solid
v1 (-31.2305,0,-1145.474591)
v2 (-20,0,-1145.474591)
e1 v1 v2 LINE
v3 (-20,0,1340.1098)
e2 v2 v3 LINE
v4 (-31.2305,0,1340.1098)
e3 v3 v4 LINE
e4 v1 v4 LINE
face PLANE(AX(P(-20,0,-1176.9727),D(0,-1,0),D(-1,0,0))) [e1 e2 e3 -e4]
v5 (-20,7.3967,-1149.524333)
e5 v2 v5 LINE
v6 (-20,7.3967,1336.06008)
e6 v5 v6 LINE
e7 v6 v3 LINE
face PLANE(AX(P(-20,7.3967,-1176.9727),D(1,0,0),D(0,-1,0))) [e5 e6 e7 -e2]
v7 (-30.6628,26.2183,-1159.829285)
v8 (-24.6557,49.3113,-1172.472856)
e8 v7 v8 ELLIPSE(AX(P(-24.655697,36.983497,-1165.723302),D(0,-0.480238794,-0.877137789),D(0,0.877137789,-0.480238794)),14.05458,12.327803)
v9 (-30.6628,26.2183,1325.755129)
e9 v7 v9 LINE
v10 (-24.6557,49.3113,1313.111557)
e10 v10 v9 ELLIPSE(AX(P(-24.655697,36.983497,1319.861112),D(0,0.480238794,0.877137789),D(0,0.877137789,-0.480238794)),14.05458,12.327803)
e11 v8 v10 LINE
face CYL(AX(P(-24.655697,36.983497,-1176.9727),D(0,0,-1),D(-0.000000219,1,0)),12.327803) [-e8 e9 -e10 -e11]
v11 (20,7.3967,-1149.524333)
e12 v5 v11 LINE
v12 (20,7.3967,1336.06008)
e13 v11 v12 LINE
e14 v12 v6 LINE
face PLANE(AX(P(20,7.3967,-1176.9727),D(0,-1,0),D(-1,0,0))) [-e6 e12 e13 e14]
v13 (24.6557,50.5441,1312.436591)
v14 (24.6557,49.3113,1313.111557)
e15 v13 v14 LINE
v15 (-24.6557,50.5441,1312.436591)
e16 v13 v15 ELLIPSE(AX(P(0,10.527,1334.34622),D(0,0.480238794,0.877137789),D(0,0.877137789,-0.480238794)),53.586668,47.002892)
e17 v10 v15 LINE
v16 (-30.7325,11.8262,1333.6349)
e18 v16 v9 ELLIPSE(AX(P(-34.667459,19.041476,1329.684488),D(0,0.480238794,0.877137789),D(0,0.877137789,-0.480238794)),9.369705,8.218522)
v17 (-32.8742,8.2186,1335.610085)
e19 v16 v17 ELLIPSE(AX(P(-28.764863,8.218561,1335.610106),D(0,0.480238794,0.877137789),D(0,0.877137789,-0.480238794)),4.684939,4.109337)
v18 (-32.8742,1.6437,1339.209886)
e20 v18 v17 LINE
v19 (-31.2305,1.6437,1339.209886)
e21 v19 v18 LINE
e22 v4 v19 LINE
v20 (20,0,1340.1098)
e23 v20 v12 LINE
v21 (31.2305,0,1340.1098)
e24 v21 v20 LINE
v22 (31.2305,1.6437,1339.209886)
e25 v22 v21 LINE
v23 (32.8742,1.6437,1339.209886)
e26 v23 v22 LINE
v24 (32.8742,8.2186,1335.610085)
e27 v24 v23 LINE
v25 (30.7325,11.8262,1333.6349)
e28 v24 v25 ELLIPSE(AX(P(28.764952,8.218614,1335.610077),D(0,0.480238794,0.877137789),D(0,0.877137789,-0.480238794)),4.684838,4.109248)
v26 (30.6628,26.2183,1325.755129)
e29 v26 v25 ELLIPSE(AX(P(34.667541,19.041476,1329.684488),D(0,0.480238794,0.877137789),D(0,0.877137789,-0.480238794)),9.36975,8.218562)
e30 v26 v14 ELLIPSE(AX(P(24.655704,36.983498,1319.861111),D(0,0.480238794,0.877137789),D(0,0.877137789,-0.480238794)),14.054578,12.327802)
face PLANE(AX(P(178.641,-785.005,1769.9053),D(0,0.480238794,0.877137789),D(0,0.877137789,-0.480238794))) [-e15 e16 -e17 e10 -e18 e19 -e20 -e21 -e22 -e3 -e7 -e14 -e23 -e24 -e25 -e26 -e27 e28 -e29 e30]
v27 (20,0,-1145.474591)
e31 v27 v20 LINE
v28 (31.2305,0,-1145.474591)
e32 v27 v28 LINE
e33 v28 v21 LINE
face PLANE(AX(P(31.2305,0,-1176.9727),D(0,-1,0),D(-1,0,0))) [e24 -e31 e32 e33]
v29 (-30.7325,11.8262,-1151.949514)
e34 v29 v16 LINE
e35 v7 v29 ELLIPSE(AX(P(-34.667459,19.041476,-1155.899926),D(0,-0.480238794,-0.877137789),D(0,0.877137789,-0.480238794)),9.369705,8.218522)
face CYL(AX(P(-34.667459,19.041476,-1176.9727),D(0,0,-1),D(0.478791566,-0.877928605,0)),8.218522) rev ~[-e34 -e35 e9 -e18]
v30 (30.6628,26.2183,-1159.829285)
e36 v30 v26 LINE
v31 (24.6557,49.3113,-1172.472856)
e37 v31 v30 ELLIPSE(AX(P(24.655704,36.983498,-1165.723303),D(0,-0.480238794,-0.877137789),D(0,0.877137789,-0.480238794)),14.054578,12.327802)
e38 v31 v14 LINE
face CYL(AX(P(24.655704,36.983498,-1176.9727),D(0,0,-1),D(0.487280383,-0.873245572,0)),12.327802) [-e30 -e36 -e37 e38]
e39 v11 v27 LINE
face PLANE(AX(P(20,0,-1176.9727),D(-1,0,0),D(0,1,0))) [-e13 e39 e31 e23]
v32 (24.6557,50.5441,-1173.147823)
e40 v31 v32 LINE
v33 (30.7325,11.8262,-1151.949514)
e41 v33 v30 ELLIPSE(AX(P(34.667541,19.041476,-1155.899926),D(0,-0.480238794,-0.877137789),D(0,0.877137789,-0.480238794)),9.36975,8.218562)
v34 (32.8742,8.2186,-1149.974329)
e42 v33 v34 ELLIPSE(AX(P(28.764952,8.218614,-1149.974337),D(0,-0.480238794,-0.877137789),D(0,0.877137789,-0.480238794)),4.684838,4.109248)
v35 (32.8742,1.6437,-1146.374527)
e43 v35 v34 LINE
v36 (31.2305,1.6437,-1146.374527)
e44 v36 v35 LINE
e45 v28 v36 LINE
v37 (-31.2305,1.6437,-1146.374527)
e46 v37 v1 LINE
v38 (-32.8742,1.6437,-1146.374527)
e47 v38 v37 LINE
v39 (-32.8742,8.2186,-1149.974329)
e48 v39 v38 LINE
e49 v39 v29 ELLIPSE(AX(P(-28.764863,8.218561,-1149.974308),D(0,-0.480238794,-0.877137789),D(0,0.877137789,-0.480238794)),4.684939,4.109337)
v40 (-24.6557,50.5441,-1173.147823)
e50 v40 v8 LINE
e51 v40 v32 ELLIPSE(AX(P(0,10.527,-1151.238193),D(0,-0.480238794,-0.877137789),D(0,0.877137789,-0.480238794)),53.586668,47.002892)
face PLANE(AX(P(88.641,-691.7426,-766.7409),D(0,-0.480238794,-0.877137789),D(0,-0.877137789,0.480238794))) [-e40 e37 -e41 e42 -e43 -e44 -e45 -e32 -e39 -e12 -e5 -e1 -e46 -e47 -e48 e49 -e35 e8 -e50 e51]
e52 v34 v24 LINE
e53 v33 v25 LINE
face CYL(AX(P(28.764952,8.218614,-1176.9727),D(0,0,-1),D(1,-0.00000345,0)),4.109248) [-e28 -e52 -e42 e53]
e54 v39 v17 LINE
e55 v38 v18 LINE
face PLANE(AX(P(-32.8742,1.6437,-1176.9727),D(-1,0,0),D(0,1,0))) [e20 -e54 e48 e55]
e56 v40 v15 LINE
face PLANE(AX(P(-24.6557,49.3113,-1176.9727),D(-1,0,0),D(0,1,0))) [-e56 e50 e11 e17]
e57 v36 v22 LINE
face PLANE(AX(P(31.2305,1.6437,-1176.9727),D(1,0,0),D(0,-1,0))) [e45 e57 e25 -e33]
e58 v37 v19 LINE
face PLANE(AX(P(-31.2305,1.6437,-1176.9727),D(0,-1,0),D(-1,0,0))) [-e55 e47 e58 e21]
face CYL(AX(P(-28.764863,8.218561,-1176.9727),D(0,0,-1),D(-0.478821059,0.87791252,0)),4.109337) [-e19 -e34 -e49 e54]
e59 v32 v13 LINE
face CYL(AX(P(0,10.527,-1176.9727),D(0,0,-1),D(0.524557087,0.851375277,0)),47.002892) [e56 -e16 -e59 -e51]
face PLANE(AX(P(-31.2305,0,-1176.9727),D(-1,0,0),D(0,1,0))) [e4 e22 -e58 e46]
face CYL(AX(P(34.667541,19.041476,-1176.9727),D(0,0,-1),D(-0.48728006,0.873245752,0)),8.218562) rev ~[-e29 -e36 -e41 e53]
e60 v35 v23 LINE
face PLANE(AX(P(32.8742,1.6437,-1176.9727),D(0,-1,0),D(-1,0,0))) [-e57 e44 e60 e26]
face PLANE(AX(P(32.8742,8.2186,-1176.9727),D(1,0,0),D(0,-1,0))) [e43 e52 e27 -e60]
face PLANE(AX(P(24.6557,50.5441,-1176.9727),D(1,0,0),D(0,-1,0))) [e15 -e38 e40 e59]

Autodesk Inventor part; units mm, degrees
sketch "Поручень" plane through (0, 0, 0) normal (0, 0, 1) x (1, 0, 0)
  line L0 (20.3655, -7.6059) -> (20.3655, -0.2092)
  line L1 (20.3655, -0.2092) -> (-19.6345, -0.2092)
  line L2 (-19.6345, -0.2092) -> (-19.6345, -7.6059)
  line L3 (-19.6345, -7.6059) -> (-30.865, -7.6059)
  line L4 (-30.865, -7.6059) -> (-30.865, -5.9622)
  line L5 (-30.865, -5.9622) -> (-32.5087, -5.9622)
  line L6 (-32.5087, -5.9622) -> (-32.5087, 0.6126)
  arc A0 (-30.367, 4.2203) -> (-32.5087, 0.6126) centre (-28.3995, 0.6126) ccw
  arc A1 (-30.367, 4.2203) -> (-30.2973, 18.6123) centre (-34.302, 11.4355) ccw
  arc A2 (-24.2902, 41.7054) -> (-30.2973, 18.6123) centre (-24.2902, 29.3776) ccw
  line L7 (-24.2902, 41.7054) -> (-24.2902, 42.9382)
  arc A3 (25.0211, 42.9382) -> (-24.2902, 42.9382) centre (0.3655, 2.9211) ccw
  line L8 (25.0211, 42.9382) -> (25.0211, 41.7054)
  arc A4 (31.0282, 18.6123) -> (25.0211, 41.7054) centre (25.0211, 29.3776) ccw
  arc A5 (31.0282, 18.6123) -> (31.0979, 4.2203) centre (35.033, 11.4355) ccw
  arc A6 (33.2397, 0.6126) -> (31.0979, 4.2203) centre (29.1304, 0.6126) ccw
  line L9 (33.2397, 0.6126) -> (33.2397, -5.9622)
  line L10 (33.2397, -5.9622) -> (31.596, -5.9622)
  line L11 (31.596, -5.9622) -> (31.596, -7.6059)
  line L12 (31.596, -7.6059) -> (20.3655, -7.6059)
  point P0 (0.3655, -0.2092)
  point P1 (0.3655, -7.6059)
sketch "Эскиз" plane through (0, 0, 0) normal (0, 0, 1) x (1, 0, 0)
  line L0 (20, 0) -> (20, 7.3967)
  line L1 (20, 7.3967) -> (-20, 7.3967)
  line L2 (-20, 7.3967) -> (-20, 0)
  line L3 (-20, 0) -> (-31.2305, 0)
  line L4 (-31.2305, 0) -> (-31.2305, 1.6437)
  line L5 (-31.2305, 1.6437) -> (-32.8742, 1.6437)
  line L6 (-32.8742, 1.6437) -> (-32.8742, 8.2186)
  arc A0 (-30.7325, 11.8262) -> (-32.8742, 8.2186) centre (-28.7649, 8.2186) ccw
  arc A1 (-30.7325, 11.8262) -> (-30.6628, 26.2183) centre (-34.6675, 19.0415) ccw
  arc A2 (-24.6557, 49.3113) -> (-30.6628, 26.2183) centre (-24.6557, 36.9835) ccw
  line L7 (-24.6557, 49.3113) -> (-24.6557, 50.5441)
  arc A3 (24.6557, 50.5441) -> (-24.6557, 50.5441) centre (0, 10.527) ccw
  line L8 (24.6557, 50.5441) -> (24.6557, 49.3113)
  arc A4 (30.6628, 26.2183) -> (24.6557, 49.3113) centre (24.6557, 36.9835) ccw
  arc A5 (30.6628, 26.2183) -> (30.7325, 11.8262) centre (34.6675, 19.0415) ccw
  arc A6 (32.8742, 8.2186) -> (30.7325, 11.8262) centre (28.7649, 8.2186) ccw
  line L9 (32.8742, 8.2186) -> (32.8742, 1.6437)
  line L10 (32.8742, 1.6437) -> (31.2305, 1.6437)
  line L11 (31.2305, 1.6437) -> (31.2305, 0)
  line L12 (31.2305, 0) -> (20, 0)
  point P0 (0, 0)
ref_plane "Начальная плоскость" through (0, 0, -1176.9727) normal (0, 0, 1) x (1, 0, 0)
ref_plane "РабПлоскость2" through (0, 0, 1691.8665) normal (0, 0, 1) x (1, 0, 0)
extrude "Тело" add sketch "Эскиз" along normal up to surface (2517.0825 mm away) from surface at -1176.9727
ref_plane "Конечная плоскость" through (0, 0, 1340.1098) normal (0, 0, 1) x (1, 0, 0)
ref_plane "РабПлоскость4" through (178.641, -785.005, 1769.9053) normal (0, 0.4802388, 0.8771378) x (1, 0, 0)
split "Разделение1" plane through (178.641, -785.005, 1769.9053) removes the side toward (0, 0.4802388, 0.8771378)
ref_plane "РабПлоскость5" through (88.641, -691.7426, -766.7409) normal (0, -0.4802388, -0.8771378) x (1, 0, 0)
split "Разделение2" plane through (88.641, -691.7426, -766.7409) removes the side toward (0, -0.4802388, -0.8771378)
equation "\"ШИРИНА\" = 75"
equation "\"ТОЛЩВЫС\" = 58"
equation "\"d0\" = -G_OFFSET_START"
equation "\"СЕЧЕНИЕ_СМЕЩ\" = 0"
equation "\"G_OFFSET_END\" = -351.75672"
equation "\"d4\" = ДЛИНА + G_OFFSET_END"
equation "\"G_OFFSET_START\" = 1176.97268"
equation "\"G_L\" = ДЛИНА + G_OFFSET_START + G_OFFSET_END"
equation "\"ДЛИНА\" = 1691.866499"
properties part number "Поручень" material "Древесина (дуб)"
